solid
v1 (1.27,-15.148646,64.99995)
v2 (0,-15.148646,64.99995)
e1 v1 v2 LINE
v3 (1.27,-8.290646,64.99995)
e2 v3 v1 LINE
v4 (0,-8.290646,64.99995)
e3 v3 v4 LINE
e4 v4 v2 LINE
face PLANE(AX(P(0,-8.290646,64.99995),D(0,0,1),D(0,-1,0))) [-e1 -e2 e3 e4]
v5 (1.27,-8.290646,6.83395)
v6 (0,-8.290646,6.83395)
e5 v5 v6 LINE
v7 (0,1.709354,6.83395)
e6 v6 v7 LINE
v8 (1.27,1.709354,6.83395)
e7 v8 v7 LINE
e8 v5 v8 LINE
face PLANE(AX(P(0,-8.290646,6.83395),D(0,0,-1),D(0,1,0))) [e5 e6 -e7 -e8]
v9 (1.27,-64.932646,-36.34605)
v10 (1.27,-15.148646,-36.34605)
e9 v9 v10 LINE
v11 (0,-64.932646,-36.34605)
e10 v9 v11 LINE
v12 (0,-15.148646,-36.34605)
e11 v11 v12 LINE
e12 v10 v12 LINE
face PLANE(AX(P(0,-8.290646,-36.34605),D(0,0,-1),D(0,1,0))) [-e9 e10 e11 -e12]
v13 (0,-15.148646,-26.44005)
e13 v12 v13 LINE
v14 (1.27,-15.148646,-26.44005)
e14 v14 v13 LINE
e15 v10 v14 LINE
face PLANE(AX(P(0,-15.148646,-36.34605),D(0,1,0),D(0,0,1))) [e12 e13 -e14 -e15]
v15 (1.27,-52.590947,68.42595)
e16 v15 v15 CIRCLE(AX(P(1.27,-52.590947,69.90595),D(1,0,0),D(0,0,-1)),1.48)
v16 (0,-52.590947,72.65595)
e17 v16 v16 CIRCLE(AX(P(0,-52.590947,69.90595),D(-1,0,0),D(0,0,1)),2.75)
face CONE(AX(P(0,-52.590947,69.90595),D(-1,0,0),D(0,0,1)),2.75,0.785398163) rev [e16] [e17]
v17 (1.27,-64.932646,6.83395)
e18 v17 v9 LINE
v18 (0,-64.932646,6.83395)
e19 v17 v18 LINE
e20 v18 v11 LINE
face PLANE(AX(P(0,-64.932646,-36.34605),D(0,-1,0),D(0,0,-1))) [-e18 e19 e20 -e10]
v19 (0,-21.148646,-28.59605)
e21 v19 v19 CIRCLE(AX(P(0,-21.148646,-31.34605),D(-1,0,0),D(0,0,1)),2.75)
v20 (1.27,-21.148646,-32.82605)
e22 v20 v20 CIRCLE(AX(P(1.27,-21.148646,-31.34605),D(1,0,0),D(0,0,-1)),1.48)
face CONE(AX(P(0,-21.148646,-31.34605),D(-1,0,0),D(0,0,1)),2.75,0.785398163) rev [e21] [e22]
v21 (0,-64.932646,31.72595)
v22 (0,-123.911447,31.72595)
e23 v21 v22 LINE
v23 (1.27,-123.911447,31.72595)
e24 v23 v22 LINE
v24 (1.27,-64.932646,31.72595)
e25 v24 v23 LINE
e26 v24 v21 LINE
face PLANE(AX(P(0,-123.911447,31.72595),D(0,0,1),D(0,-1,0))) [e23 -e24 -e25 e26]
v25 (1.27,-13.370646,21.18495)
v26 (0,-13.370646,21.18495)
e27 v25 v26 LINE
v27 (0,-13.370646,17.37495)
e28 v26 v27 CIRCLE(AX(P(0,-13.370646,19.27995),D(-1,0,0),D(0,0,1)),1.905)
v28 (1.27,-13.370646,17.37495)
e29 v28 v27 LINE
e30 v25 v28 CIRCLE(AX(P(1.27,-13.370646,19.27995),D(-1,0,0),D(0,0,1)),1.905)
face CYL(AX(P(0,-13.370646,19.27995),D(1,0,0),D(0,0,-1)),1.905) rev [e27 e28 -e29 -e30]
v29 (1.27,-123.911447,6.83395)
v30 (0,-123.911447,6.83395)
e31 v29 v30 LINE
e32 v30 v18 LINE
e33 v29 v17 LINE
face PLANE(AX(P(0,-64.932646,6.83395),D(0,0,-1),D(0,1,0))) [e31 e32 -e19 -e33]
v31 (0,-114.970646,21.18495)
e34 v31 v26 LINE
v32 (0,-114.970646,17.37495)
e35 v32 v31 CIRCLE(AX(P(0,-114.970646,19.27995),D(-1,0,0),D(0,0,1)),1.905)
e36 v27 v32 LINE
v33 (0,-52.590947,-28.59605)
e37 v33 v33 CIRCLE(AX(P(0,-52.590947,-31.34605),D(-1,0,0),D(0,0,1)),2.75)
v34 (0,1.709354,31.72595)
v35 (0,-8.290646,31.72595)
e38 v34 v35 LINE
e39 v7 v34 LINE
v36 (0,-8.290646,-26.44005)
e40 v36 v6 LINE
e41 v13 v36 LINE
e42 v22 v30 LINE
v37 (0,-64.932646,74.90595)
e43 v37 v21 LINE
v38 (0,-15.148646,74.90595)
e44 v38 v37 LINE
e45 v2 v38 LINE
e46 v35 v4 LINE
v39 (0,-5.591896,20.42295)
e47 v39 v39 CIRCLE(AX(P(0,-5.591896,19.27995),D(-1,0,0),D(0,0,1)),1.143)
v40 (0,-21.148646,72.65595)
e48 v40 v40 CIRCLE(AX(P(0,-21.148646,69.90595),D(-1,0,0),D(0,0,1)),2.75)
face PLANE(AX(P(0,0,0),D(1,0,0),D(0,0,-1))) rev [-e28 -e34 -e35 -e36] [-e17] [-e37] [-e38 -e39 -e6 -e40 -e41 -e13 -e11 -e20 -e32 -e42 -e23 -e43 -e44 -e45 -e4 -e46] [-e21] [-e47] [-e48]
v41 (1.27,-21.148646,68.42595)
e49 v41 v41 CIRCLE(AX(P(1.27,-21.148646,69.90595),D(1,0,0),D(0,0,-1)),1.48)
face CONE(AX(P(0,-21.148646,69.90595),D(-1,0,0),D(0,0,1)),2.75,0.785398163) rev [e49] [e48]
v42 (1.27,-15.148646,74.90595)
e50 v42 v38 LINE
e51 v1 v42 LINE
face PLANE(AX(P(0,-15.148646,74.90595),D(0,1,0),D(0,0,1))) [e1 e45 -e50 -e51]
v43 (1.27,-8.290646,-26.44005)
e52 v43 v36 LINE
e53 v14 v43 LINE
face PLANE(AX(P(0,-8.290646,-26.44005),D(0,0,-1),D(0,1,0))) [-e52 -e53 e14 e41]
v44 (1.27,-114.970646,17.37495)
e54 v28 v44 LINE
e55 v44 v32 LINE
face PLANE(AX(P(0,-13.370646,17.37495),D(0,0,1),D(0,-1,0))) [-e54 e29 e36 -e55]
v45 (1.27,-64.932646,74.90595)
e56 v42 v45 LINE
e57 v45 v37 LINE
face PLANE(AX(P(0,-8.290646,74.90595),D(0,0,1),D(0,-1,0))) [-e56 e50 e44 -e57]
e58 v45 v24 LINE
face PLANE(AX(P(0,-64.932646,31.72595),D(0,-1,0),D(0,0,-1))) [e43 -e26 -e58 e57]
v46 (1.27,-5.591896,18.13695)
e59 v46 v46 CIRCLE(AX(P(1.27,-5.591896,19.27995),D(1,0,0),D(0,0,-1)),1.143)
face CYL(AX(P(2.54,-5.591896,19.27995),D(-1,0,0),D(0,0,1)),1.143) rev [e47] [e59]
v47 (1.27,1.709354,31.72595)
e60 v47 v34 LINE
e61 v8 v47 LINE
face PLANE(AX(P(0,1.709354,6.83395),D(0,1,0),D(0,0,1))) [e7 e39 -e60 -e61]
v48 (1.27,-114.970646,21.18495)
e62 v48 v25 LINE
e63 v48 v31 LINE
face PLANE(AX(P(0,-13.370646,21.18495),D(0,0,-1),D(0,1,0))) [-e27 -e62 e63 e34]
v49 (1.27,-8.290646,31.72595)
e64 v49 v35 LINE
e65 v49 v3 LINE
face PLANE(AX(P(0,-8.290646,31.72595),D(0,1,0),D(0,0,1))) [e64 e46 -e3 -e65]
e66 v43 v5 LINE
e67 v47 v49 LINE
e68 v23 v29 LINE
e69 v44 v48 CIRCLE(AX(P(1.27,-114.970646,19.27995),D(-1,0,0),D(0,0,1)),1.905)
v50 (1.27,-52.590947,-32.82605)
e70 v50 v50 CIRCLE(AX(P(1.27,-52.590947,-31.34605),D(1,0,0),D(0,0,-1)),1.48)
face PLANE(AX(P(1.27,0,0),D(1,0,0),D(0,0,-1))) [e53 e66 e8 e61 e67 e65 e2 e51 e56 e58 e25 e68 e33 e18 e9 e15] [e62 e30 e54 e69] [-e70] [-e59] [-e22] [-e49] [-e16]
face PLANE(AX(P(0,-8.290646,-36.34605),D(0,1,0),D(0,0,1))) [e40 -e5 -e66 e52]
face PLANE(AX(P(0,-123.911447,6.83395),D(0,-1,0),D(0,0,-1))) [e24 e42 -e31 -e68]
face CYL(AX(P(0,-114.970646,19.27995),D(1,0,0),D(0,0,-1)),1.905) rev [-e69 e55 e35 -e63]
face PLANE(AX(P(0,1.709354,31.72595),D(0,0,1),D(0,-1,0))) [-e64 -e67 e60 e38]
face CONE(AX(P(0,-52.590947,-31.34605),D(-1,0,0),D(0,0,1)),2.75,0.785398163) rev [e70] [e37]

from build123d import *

# Parameters (mm, degrees)
BOSS_EXTRUDE1_DEPTH                          = 1.27
CUT_EXTRUDE2_REACH                           = 146.798
SKETCH7_W                                    = 9.906
SKETCH7_H                                    = 6.858
CUT_EXTRUDE3_REACH                           = 146.798
SKETCH18_R                                   = 1.143
CUT_EXTRUDE4_DEPTH                           = 2.54
CSK_FOR_M2_5_COUNTERSUNK_FLAT_HEAD_S_2_COUNT = 2
CSK_FOR_M2_5_COUNTERSUNK_FLAT_HEAD_S_2_PITCH = 31.442301831
CSK_FOR_M2_5_COUNTERSUNK_FLAT_HEAD_S_3_COUNT = 2
CSK_FOR_M2_5_COUNTERSUNK_FLAT_HEAD_S_3_PITCH = 101.252
CSK_FOR_M2_5_COUNTERSUNK_FLAT_HEAD_S_4_COUNT = 2
CSK_FOR_M2_5_COUNTERSUNK_FLAT_HEAD_S_4_PITCH = 106.021629154


with BuildPart() as part:
    # Sketch2 → Boss-Extrude1 (new body)
    with BuildSketch(Plane(origin=(0, 0, 0), x_dir=(0, 0, -1), z_dir=(1, 0, 0))):
        Polygon((36.346050031, -8.290645537), (-6.833949969, -8.290645537), (-6.833949969, 1.709354463), (-31.725949969, 1.709354463), (-31.725949969, -8.290645537), (-74.905949969, -8.290645537), (-74.905949969, -64.932645537), (-31.725949969, -64.932645537), (-31.725949969, -123.911447323), (-6.833949969, -123.911447323), (-6.833949969, -64.932645537), (36.346050031, -64.932645537), align=None)
    extrude(amount=BOSS_EXTRUDE1_DEPTH)

    # Sketch7 → Cut-Extrude2 (cut, up to next)
    with BuildSketch(Plane.ZY, mode=Mode.PRIVATE) as cut_extrude2_sk1:
        with Locations((-31.393050031, -11.719645537)):
            Rectangle(SKETCH7_W, SKETCH7_H)
    cut_extrude2_tool1 = extrude(cut_extrude2_sk1.sketch, amount=-CUT_EXTRUDE2_REACH, mode=Mode.PRIVATE) & part.part
    # Sketch7 → Cut-Extrude2 (cut, up to next)
    with BuildSketch(Plane.ZY, mode=Mode.PRIVATE) as cut_extrude2_sk2:
        with Locations((69.952949969, -11.719645537)):
            Rectangle(SKETCH7_W, SKETCH7_H)
    cut_extrude2_tool2 = extrude(cut_extrude2_sk2.sketch, amount=-CUT_EXTRUDE2_REACH, mode=Mode.PRIVATE) & part.part
    add(cut_extrude2_tool1.solids().sort_by_distance((0, -11.719646, -31.39305))[0], mode=Mode.SUBTRACT)
    add(cut_extrude2_tool2.solids().sort_by_distance((0, -11.719646, 69.95295))[0], mode=Mode.SUBTRACT)

    # Sketch10 → Cut-Extrude3 (cut, up to next)
    with BuildSketch(Plane.ZY, mode=Mode.PRIVATE) as cut_extrude3_sk1:
        with BuildLine():
            Line((21.184949969, -13.370645537), (21.184949969, -114.970645537))
            ThreePointArc((21.184949969, -114.970645537), (19.279949969, -116.875645537), (17.374949969, -114.970645537))
            Line((17.374949969, -114.970645537), (17.374949969, -13.370645537))
            ThreePointArc((17.374949969, -13.370645537), (19.279949969, -11.465645537), (21.184949969, -13.370645537))
        make_face()
    cut_extrude3_tool1 = extrude(cut_extrude3_sk1.sketch, amount=-CUT_EXTRUDE3_REACH, mode=Mode.PRIVATE) & part.part
    add(cut_extrude3_tool1.solids().sort_by_distance((0, -64.170646, 19.27995))[0], mode=Mode.SUBTRACT)

    # Sketch18 → Cut-Extrude4 (cut)
    with BuildSketch(Plane.ZY):
        with Locations((19.279949969, -5.591895537)):
            Circle(SKETCH18_R)
    extrude(amount=-CUT_EXTRUDE4_DEPTH, mode=Mode.SUBTRACT)

    # Sketch21 → CSK for M2.5 Countersunk Flat Head Screw1 (revolve, cut)
    with BuildSketch(Plane(origin=(0, -21.148645537, -31.346050031), x_dir=(0, 0, 1), z_dir=(0, 1, 0))):
        Polygon((0, 0), (0, 1.27), (1.45, 1.27), (1.45, 1.3), (2.75, 0), align=None)
    csk_for_m2_5_countersunk_flat_head_screw = revolve(axis=Axis((-6.35, -21.148645537, -31.346050031), (1, 0, 0)), mode=Mode.SUBTRACT)

    # CSK for M2.5 Countersunk Flat Head S 2: CSK for M2.5 Countersunk Flat Head Screw1 ×2
    with Locations(*[(0, -i * CSK_FOR_M2_5_COUNTERSUNK_FLAT_HEAD_S_2_PITCH, 0) for i in range(1, CSK_FOR_M2_5_COUNTERSUNK_FLAT_HEAD_S_2_COUNT)]):
        add(csk_for_m2_5_countersunk_flat_head_screw, mode=Mode.SUBTRACT)

    # CSK for M2.5 Countersunk Flat Head S 3: CSK for M2.5 Countersunk Flat Head Screw1 ×2
    with Locations(*[(0, 0, i * CSK_FOR_M2_5_COUNTERSUNK_FLAT_HEAD_S_3_PITCH) for i in range(1, CSK_FOR_M2_5_COUNTERSUNK_FLAT_HEAD_S_3_COUNT)]):
        add(csk_for_m2_5_countersunk_flat_head_screw, mode=Mode.SUBTRACT)

    # CSK for M2.5 Countersunk Flat Head S 4: CSK for M2.5 Countersunk Flat Head Screw1 ×2
    with Locations(*[Vector(0, -0.29656497529839515, 0.9550126781494905) * (i * CSK_FOR_M2_5_COUNTERSUNK_FLAT_HEAD_S_4_PITCH) for i in range(1, CSK_FOR_M2_5_COUNTERSUNK_FLAT_HEAD_S_4_COUNT)]):
        add(csk_for_m2_5_countersunk_flat_head_screw, mode=Mode.SUBTRACT)


solid = part.part
